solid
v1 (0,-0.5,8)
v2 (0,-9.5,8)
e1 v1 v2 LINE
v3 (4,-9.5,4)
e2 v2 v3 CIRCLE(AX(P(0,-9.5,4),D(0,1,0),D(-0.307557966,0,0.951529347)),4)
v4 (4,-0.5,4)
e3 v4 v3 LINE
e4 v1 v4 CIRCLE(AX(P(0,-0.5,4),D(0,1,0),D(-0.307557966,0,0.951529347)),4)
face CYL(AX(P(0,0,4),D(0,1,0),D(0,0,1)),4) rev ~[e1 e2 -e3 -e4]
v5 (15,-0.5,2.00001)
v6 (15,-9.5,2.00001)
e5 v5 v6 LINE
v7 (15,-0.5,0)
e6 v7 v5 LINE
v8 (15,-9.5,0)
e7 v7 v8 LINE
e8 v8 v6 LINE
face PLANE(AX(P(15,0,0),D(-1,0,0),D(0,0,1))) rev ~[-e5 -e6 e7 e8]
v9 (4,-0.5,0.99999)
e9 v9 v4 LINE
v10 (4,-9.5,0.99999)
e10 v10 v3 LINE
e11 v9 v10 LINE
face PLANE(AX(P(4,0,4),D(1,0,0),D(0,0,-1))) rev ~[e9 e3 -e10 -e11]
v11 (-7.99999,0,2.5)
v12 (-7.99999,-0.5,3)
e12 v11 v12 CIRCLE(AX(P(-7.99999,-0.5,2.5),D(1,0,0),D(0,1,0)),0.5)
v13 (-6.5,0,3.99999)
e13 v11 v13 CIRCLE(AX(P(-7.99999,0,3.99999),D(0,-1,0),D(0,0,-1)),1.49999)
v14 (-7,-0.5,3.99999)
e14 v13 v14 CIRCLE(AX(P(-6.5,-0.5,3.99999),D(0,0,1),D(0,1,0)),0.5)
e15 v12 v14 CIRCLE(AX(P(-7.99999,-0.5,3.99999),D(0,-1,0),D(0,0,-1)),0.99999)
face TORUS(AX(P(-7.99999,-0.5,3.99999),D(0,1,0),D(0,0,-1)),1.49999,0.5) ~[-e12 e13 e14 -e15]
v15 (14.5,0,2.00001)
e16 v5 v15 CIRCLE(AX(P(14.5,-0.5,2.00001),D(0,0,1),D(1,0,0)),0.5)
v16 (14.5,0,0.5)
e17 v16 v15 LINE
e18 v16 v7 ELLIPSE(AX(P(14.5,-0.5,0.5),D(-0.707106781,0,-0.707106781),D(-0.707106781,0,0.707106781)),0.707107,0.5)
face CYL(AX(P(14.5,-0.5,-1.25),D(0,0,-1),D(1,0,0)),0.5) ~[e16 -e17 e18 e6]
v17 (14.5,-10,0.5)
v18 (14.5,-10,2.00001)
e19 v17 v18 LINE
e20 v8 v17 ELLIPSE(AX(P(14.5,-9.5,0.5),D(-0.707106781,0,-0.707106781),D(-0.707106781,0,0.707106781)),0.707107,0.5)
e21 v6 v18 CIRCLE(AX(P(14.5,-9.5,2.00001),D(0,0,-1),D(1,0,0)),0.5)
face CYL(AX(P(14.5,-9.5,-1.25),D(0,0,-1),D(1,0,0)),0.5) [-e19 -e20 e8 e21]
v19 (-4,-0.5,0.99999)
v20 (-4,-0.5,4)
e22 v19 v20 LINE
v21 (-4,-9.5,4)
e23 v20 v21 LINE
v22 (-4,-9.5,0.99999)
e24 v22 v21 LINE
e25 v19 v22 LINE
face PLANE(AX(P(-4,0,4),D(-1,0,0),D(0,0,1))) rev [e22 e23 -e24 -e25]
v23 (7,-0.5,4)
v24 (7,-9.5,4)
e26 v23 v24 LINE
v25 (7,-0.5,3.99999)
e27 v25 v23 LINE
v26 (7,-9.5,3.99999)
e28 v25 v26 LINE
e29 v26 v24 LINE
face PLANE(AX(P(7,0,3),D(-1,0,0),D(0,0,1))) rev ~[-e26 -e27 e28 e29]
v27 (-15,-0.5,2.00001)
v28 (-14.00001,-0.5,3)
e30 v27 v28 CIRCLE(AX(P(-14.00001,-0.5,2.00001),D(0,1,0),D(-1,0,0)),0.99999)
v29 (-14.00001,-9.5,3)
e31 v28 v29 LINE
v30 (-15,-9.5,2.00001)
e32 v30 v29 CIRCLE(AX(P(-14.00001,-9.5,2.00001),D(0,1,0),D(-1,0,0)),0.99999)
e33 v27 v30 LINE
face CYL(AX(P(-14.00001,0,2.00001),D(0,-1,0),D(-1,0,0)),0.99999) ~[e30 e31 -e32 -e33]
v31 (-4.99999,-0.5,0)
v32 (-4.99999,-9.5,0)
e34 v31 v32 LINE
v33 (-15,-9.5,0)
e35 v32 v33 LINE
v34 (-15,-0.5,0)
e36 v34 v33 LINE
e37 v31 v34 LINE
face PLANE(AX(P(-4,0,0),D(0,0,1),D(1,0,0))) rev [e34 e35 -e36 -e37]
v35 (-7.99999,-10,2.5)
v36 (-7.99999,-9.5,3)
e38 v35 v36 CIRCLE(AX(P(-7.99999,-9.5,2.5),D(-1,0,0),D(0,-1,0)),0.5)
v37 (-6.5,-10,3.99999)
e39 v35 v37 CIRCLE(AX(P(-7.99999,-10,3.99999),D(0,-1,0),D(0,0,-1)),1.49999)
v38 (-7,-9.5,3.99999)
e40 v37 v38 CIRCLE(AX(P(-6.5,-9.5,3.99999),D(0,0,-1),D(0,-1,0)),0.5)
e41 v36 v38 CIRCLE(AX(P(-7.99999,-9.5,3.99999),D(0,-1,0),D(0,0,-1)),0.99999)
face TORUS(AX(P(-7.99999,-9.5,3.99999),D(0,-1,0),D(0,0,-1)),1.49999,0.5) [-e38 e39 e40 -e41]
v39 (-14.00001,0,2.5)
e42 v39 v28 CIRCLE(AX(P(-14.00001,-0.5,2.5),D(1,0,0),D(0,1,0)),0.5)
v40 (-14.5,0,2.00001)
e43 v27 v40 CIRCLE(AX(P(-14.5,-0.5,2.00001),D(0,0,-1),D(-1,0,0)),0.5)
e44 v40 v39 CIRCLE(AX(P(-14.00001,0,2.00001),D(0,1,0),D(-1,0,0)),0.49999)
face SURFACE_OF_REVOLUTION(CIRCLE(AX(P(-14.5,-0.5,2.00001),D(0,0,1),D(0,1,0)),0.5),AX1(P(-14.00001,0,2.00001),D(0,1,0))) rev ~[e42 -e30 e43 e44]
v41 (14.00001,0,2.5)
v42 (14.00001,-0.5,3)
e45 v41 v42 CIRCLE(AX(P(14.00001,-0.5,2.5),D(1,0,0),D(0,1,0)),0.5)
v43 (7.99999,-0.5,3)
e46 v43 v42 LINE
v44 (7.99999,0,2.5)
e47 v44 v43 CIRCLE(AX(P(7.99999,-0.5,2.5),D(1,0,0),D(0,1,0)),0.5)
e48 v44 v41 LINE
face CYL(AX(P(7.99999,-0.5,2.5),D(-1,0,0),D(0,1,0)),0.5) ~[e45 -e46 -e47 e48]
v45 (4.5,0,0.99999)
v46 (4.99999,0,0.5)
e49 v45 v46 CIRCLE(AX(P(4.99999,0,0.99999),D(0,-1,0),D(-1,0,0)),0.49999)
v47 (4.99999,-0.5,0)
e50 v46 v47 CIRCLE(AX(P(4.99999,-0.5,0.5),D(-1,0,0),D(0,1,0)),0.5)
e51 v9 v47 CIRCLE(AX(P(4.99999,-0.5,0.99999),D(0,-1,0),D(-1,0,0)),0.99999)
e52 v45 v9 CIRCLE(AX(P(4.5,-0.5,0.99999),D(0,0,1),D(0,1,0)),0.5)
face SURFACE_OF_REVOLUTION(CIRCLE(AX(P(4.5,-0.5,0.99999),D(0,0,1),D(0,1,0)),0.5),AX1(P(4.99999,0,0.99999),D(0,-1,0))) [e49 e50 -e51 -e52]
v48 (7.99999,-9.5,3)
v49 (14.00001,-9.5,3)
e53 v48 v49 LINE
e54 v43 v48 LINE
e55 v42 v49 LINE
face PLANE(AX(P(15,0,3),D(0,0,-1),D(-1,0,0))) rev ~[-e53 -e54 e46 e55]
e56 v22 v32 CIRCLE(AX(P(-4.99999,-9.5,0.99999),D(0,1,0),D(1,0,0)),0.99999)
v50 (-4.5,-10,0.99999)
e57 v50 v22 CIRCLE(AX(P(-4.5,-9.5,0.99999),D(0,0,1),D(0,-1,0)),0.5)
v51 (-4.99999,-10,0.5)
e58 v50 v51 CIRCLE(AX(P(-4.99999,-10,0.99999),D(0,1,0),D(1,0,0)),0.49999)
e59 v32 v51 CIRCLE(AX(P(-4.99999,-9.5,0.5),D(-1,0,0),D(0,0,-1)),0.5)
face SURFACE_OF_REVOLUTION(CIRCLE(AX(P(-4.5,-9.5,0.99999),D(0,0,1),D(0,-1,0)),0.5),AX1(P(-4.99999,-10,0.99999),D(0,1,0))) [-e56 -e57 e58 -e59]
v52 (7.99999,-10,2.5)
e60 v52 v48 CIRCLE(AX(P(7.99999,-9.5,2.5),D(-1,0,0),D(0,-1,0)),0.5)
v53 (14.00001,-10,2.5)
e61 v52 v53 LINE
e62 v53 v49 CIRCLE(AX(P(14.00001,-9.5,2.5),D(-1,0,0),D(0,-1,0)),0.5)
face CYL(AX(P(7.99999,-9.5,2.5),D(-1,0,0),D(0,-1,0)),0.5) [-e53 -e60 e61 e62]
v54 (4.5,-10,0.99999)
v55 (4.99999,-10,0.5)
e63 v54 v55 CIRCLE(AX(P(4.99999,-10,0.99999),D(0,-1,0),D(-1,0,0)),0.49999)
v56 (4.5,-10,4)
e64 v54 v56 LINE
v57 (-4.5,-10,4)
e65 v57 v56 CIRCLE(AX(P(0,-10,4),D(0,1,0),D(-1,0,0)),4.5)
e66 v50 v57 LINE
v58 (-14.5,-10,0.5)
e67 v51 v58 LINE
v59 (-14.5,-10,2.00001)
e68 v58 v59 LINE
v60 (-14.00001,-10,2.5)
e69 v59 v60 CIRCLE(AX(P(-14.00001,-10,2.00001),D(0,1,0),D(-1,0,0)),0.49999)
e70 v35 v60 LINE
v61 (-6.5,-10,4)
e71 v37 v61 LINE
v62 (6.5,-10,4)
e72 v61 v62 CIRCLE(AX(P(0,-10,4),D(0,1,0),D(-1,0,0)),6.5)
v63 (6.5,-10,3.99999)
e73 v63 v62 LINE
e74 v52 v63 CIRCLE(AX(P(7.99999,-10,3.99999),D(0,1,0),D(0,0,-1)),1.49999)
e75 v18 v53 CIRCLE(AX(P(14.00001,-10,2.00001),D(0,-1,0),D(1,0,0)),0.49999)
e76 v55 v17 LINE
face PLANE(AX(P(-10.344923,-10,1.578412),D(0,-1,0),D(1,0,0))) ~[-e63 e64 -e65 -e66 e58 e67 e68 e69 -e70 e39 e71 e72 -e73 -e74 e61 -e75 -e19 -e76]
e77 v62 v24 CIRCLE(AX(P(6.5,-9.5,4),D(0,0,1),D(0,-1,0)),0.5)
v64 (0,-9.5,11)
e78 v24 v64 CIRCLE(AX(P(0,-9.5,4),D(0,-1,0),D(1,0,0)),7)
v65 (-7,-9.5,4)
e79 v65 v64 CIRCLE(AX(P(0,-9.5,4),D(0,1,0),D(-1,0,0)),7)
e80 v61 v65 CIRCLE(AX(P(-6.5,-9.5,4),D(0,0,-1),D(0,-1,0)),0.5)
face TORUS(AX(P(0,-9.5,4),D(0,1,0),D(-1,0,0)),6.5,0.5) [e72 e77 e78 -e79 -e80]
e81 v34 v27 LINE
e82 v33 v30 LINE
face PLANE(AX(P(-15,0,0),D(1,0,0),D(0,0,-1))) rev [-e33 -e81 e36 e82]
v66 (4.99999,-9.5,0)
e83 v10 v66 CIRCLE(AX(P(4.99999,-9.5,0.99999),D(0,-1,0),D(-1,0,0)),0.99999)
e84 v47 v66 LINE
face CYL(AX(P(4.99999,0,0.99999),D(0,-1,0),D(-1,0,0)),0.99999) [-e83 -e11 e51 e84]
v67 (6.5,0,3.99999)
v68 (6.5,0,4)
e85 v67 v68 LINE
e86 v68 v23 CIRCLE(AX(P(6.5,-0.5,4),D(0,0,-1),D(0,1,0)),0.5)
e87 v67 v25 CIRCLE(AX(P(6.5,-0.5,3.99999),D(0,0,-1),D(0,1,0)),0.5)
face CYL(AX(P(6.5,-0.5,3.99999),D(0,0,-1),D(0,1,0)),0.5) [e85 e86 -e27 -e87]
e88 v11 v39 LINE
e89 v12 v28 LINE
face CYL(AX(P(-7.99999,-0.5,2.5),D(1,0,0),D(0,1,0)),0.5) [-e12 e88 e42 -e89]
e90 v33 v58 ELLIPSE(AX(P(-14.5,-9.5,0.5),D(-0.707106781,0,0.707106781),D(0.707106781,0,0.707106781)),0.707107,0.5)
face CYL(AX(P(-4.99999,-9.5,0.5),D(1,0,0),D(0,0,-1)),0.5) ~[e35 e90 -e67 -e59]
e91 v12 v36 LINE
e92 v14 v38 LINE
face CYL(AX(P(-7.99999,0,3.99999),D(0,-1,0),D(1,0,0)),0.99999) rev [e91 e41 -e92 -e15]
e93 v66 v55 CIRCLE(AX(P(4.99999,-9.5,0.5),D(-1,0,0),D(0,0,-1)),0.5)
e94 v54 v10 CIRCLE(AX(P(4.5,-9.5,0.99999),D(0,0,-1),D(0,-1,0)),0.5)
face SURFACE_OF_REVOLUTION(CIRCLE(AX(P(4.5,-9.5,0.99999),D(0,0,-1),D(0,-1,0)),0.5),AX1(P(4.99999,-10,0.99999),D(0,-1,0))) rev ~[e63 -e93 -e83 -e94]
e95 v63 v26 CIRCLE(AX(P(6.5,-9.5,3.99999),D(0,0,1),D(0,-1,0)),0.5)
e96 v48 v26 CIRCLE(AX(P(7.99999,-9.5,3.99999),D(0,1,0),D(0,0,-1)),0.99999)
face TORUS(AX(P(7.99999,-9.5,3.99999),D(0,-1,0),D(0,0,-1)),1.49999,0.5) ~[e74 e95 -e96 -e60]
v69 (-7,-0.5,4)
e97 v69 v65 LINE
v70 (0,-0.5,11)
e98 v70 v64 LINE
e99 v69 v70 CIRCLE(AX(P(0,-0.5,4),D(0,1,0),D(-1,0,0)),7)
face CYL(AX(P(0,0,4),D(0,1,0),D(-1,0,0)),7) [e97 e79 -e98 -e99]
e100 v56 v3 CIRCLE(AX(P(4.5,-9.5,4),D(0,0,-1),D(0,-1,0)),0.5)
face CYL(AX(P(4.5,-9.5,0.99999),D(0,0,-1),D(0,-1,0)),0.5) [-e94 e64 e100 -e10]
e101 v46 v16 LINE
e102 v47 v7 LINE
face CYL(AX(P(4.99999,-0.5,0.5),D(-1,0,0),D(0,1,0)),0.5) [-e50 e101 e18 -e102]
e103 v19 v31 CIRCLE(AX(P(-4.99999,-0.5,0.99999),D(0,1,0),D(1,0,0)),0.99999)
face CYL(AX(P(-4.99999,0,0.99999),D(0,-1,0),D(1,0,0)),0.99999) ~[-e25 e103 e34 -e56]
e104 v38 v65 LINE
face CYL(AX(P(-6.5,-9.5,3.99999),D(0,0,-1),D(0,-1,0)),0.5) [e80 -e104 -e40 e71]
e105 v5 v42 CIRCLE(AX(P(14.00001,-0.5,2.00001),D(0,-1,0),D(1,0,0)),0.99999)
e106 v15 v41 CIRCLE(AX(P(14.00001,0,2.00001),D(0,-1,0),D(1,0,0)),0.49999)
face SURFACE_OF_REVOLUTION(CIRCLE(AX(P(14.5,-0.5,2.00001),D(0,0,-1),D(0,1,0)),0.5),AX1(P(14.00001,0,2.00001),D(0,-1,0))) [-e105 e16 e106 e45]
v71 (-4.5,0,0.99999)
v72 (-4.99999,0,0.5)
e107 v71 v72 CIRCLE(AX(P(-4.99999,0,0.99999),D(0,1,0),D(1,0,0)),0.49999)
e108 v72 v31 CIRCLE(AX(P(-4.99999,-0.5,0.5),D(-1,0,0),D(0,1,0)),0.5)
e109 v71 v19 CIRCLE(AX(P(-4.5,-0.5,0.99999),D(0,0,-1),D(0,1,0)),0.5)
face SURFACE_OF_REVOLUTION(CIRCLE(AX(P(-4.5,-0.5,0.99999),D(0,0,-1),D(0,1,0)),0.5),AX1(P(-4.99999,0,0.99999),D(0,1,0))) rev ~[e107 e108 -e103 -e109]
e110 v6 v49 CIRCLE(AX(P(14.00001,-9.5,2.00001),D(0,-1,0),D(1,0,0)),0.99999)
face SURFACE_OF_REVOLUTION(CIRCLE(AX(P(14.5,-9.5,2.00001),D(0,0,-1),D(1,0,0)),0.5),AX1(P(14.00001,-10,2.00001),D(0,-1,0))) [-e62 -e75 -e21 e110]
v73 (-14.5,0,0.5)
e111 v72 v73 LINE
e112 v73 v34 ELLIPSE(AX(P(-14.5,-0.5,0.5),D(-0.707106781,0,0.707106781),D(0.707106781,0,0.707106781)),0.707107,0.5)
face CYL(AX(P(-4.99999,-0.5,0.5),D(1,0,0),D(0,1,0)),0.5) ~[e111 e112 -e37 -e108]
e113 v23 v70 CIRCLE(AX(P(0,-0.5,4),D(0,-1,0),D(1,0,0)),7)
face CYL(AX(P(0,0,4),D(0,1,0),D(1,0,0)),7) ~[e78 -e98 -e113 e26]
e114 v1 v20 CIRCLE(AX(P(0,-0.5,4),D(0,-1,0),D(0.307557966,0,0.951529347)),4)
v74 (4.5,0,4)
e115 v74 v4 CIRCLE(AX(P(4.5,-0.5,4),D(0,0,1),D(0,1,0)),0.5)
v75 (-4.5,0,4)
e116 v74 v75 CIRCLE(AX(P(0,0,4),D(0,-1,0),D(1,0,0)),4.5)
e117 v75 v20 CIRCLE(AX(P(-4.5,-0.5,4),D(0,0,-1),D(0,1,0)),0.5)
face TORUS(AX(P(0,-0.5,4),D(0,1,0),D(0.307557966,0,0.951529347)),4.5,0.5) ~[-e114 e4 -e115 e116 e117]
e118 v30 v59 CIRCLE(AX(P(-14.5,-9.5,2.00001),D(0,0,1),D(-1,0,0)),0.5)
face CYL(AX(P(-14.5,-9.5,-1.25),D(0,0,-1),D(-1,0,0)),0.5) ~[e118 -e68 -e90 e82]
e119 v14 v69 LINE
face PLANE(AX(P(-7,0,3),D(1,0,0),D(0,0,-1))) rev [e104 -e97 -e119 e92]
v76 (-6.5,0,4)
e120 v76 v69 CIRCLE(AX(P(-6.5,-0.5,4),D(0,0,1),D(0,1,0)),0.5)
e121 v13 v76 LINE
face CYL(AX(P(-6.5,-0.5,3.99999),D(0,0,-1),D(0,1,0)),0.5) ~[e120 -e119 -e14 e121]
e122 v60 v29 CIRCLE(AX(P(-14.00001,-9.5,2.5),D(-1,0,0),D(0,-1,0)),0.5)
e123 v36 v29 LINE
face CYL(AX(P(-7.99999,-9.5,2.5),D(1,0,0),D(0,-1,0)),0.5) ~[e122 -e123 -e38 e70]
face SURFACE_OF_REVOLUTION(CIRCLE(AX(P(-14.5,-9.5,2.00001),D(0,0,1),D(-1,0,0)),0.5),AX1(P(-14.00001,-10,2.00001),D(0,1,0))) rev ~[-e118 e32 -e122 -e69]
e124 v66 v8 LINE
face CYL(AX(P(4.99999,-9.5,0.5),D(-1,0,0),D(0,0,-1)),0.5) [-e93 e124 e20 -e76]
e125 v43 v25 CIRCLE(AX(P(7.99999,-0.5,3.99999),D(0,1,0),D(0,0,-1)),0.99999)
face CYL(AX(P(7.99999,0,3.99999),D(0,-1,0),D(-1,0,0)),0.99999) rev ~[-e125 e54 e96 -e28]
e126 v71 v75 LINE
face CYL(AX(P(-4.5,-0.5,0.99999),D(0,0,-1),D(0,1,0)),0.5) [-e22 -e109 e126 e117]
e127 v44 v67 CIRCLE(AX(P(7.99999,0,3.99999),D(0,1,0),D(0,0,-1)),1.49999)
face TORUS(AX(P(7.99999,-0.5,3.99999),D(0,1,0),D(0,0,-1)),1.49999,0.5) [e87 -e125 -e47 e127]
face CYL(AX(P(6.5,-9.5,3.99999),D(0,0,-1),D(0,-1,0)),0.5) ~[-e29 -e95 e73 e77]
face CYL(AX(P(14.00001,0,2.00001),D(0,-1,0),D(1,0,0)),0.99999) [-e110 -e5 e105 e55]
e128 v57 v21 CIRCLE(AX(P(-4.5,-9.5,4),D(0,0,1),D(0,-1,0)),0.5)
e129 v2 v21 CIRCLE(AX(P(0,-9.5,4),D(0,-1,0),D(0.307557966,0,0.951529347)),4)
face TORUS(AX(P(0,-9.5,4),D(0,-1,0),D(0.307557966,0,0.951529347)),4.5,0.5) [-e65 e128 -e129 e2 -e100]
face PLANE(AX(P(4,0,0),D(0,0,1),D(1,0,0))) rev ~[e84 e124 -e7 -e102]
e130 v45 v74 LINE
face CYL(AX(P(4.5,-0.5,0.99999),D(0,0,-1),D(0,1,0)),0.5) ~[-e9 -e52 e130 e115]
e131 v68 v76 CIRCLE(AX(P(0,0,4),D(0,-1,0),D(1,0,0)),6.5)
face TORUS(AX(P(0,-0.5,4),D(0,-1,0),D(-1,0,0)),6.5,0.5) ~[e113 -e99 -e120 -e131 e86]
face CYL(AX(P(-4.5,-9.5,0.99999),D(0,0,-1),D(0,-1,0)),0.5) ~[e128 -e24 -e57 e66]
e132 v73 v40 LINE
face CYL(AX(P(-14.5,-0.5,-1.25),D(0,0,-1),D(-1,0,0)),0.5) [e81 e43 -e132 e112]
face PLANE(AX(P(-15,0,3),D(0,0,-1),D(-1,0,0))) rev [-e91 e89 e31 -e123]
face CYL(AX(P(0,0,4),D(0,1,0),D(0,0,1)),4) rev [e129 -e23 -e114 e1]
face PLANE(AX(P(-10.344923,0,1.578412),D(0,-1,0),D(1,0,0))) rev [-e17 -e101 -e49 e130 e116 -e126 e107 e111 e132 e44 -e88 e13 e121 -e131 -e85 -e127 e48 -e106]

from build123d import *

# Parameters (mm, degrees)
F1_DEPTH     = 10
F2_R         = 0.99999
F3_T1_DEPTH  = 1e-05
F3_T3_DEPTH  = 3.00001
F3_T5_DEPTH  = 11.25001
F3_T7_DEPTH  = 6.00002
F3_T9_DEPTH  = 3.25001
F3_T12_ANGLE = 107.9121236547
F3_T14_ANGLE = 100.2354992312
F3_T16_ANGLE = 90
F3_T18_ANGLE = 107.9121236547
F3_T20_ANGLE = 90
F3_T22_ANGLE = 100.2354992312
F3_T24_ANGLE = 90
F3_T26_ANGLE = 90
F3_T28_ANGLE = 90
F3_T30_ANGLE = 90


# Not quite as in the source:
# - a fillet or chamfer that OpenCascade refuses, or shapes differently, is made with other operations: its cross-section is extruded or revolved along the edge and cut away or added
# - a fillet or chamfer is up to 0.001 mm smaller than in the source, because OpenCascade refuses the exact size


with BuildPart() as f1:
    # F0 (on Front) → F1 (new body)
    with BuildSketch(Plane.XZ):
        with BuildLine():
            Line((7, 3), (7, 4))
            ThreePointArc((7, 4), (6.6787700412, 1.9038056538), (5.7445626465, 0))
            Line((5.7445626465, 0), (7, 0))
            Line((7, 0), (15, 0))
            Line((15, 0), (15, 3))
            Line((15, 3), (7, 3))
        make_face()
        with BuildLine():
            Line((7, 4), (4, 4))
            Line((4, 4), (4, 0))
            Line((4, 0), (5.7445626465, 0))
            ThreePointArc((5.7445626465, 0), (6.6787700412, 1.9038056538), (7, 4))
        make_face()
        with BuildLine():
            Line((0, 11), (0, 8))
            ThreePointArc((0, 8), (2.8284271247, 6.8284271247), (4, 4))
            Line((4, 4), (7, 4))
            ThreePointArc((7, 4), (4.9497474683, 8.9497474683), (0, 11))
        make_face()
    extrude(amount=F1_DEPTH)

    # F2 (radius 1 in the source; OpenCascade refuses exactly that, so slightly less here)
    f2_edges = [f1.edges().sort_by_distance(p)[0] for p in [
        (7, -5, 3),
        (4, -5, 0),
        (15, -5, 3),
    ]]
    fillet(f2_edges, radius=F2_R)

    # F3: fillet of radius 0.5 on 5 edges, made by hand

    # F3_s2 → F3_t1 (cut)
    with BuildSketch(Plane.XY.offset(3.99999)):
        with BuildLine():
            ThreePointArc((6.5, -10), (6.8535533906, -9.8535533906), (7, -9.5))
            Line((7, -9.5), (7, -10))
            Line((7, -10), (6.5, -10))
        make_face()
        with BuildLine():
            ThreePointArc((6.5, 0), (6.8535533906, -0.1464466094), (7, -0.5))
            Line((7, -0.5), (7, 0))
            Line((7, 0), (6.5, 0))
        make_face()
    extrude(amount=F3_T1_DEPTH, mode=Mode.SUBTRACT)

    # F3_s4 → F3_t3 (cut)
    with BuildSketch(Plane.XY.offset(0.99999)):
        with BuildLine():
            ThreePointArc((4.5, 0), (4.1464466094, -0.1464466094), (4, -0.5))
            Line((4, -0.5), (4, 0))
            Line((4, 0), (4.5, 0))
        make_face()
        with BuildLine():
            ThreePointArc((4.5, -10), (4.1464466094, -9.8535533906), (4, -9.5))
            Line((4, -9.5), (4, -10))
            Line((4, -10), (4.5, -10))
        make_face()
    extrude(amount=F3_T3_DEPTH, mode=Mode.SUBTRACT)

    # F3_s6 → F3_t5 (cut)
    with BuildSketch(Plane.YZ.offset(4.99999)):
        with BuildLine():
            ThreePointArc((0, 0.5), (-0.1464466094, 0.1464466094), (-0.5, 0))
            Line((-0.5, 0), (0, 0))
            Line((0, 0), (0, 0.5))
        make_face()
        with BuildLine():
            ThreePointArc((-9.5, 0), (-9.8535533906, 0.1464466094), (-10, 0.5))
            Line((-10, 0.5), (-10, 0))
            Line((-10, 0), (-9.5, 0))
        make_face()
    extrude(amount=F3_T5_DEPTH, mode=Mode.SUBTRACT)

    # F3_s8 → F3_t7 (cut)
    with BuildSketch(Plane.YZ.offset(7.99999)):
        with BuildLine():
            ThreePointArc((0, 2.5), (-0.1464466094, 2.8535533906), (-0.5, 3))
            Line((-0.5, 3), (0, 3))
            Line((0, 3), (0, 2.5))
        make_face()
        with BuildLine():
            ThreePointArc((-10, 2.5), (-9.8535533906, 2.8535533906), (-9.5, 3))
            Line((-9.5, 3), (-10, 3))
            Line((-10, 3), (-10, 2.5))
        make_face()
    extrude(amount=F3_T7_DEPTH, mode=Mode.SUBTRACT)

    # F3_s10 → F3_t9 (cut)
    with BuildSketch(Plane.XY.offset(-1.25)):
        with BuildLine():
            ThreePointArc((15, -0.5), (14.8535533906, -0.1464466094), (14.5, 0))
            Line((14.5, 0), (15, 0))
            Line((15, 0), (15, -0.5))
        make_face()
        with BuildLine():
            ThreePointArc((15, -9.5), (14.8535533906, -9.8535533906), (14.5, -10))
            Line((14.5, -10), (15, -10))
            Line((15, -10), (15, -9.5))
        make_face()
    extrude(amount=F3_T9_DEPTH, mode=Mode.SUBTRACT)

    # F3_s11 → F3_t12 (revolve, cut)
    with BuildSketch(Plane(origin=(1.1706017221, 0, 0.37836761), x_dir=(0, 1, 0), z_dir=(-0.9515293466, 0, -0.3075579661))):
        with BuildLine():
            ThreePointArc((-10, -8.3061173865), (-9.8535533906, -7.9525639959), (-9.5, -7.8061173865))
            Line((-9.5, -7.8061173865), (-10, -7.8061173865))
            Line((-10, -7.8061173865), (-10, -8.3061173865))
        make_face()
    revolve(axis=Axis((0, -10, 4), (0, 1, 0)), revolution_arc=F3_T12_ANGLE, mode=Mode.SUBTRACT)

    # F3_s13 → F3_t14 (revolve, cut)
    with BuildSketch(Plane.XY.offset(4)):
        with BuildLine():
            ThreePointArc((6.5, -10), (6.8535533906, -9.8535533906), (7, -9.5))
            Line((7, -9.5), (7, -10))
            Line((7, -10), (6.5, -10))
        make_face()
    revolve(axis=Axis((0, -10, 4), (0, -1, 0)), revolution_arc=F3_T14_ANGLE, mode=Mode.SUBTRACT)

    # F3_s15 → F3_t16 (revolve, cut)
    with BuildSketch(Plane.YZ.offset(7.99999)):
        with BuildLine():
            ThreePointArc((0, 2.5), (-0.1464466094, 2.8535533906), (-0.5, 3))
            Line((-0.5, 3), (0, 3))
            Line((0, 3), (0, 2.5))
        make_face()
    revolve(axis=Axis((7.99999, 0, 3.99999), (0, 1, 0)), revolution_arc=F3_T16_ANGLE, mode=Mode.SUBTRACT)

    # F3_s17 → F3_t18 (revolve, cut)
    with BuildSketch(Plane(origin=(1.1706017221, 0, 0.37836761), x_dir=(0, 1, 0), z_dir=(-0.9515293466, 0, -0.3075579661))):
        with BuildLine():
            ThreePointArc((0, -8.3061173865), (-0.1464466094, -7.9525639959), (-0.5, -7.8061173865))
            Line((-0.5, -7.8061173865), (0, -7.8061173865))
            Line((0, -7.8061173865), (0, -8.3061173865))
        make_face()
    revolve(axis=Axis((0, 0, 4), (0, 1, 0)), revolution_arc=F3_T18_ANGLE, mode=Mode.SUBTRACT)

    # F3_s19 → F3_t20 (revolve, cut)
    with BuildSketch(Plane.XY.offset(0.99999)):
        with BuildLine():
            ThreePointArc((4.5, 0), (4.1464466094, -0.1464466094), (4, -0.5))
            Line((4, -0.5), (4, 0))
            Line((4, 0), (4.5, 0))
        make_face()
    revolve(axis=Axis((4.99999, 0, 0.99999), (0, -1, 0)), revolution_arc=F3_T20_ANGLE, mode=Mode.SUBTRACT)

    # F3_s21 → F3_t22 (revolve, cut)
    with BuildSketch(Plane.XY.offset(4)):
        with BuildLine():
            ThreePointArc((6.5, 0), (6.8535533906, -0.1464466094), (7, -0.5))
            Line((7, -0.5), (7, 0))
            Line((7, 0), (6.5, 0))
        make_face()
    revolve(axis=Axis((0, 0, 4), (0, -1, 0)), revolution_arc=F3_T22_ANGLE, mode=Mode.SUBTRACT)

    # F3_s23 → F3_t24 (revolve, cut)
    with BuildSketch(Plane.XY.offset(2.00001)):
        with BuildLine():
            ThreePointArc((14.5, 0), (14.8535533906, -0.1464466094), (15, -0.5))
            Line((15, -0.5), (15, 0))
            Line((15, 0), (14.5, 0))
        make_face()
    revolve(axis=Axis((14.00001, 0, 2.00001), (0, -1, 0)), revolution_arc=F3_T24_ANGLE, mode=Mode.SUBTRACT)

    # F3_s25 → F3_t26 (revolve, cut)
    with BuildSketch(Plane.YZ.offset(7.99999)):
        with BuildLine():
            ThreePointArc((-10, 2.5), (-9.8535533906, 2.8535533906), (-9.5, 3))
            Line((-9.5, 3), (-10, 3))
            Line((-10, 3), (-10, 2.5))
        make_face()
    revolve(axis=Axis((7.99999, -10, 3.99999), (0, 1, 0)), revolution_arc=F3_T26_ANGLE, mode=Mode.SUBTRACT)

    # F3_s27 → F3_t28 (revolve, cut)
    with BuildSketch(Plane.XY.offset(2.00001)):
        with BuildLine():
            ThreePointArc((15, -9.5), (14.8535533906, -9.8535533906), (14.5, -10))
            Line((14.5, -10), (15, -10))
            Line((15, -10), (15, -9.5))
        make_face()
    revolve(axis=Axis((14.00001, -10, 2.00001), (0, -1, 0)), revolution_arc=F3_T28_ANGLE, mode=Mode.SUBTRACT)

    # F3_s29 → F3_t30 (revolve, cut)
    with BuildSketch(Plane.XY.offset(0.99999)):
        with BuildLine():
            ThreePointArc((4.5, -10), (4.1464466094, -9.8535533906), (4, -9.5))
            Line((4, -9.5), (4, -10))
            Line((4, -10), (4.5, -10))
        make_face()
    revolve(axis=Axis((4.99999, -10, 0.99999), (0, -1, 0)), revolution_arc=F3_T30_ANGLE, mode=Mode.SUBTRACT)

    # F4: F1 across face


with BuildPart() as f1_1:
    add(f1.part)
    add(f1.part.mirror(Plane(origin=(0, -5, 9.5), x_dir=(0, -1, 0), z_dir=(-1, 0, 0))))


solid = f1_1.part
